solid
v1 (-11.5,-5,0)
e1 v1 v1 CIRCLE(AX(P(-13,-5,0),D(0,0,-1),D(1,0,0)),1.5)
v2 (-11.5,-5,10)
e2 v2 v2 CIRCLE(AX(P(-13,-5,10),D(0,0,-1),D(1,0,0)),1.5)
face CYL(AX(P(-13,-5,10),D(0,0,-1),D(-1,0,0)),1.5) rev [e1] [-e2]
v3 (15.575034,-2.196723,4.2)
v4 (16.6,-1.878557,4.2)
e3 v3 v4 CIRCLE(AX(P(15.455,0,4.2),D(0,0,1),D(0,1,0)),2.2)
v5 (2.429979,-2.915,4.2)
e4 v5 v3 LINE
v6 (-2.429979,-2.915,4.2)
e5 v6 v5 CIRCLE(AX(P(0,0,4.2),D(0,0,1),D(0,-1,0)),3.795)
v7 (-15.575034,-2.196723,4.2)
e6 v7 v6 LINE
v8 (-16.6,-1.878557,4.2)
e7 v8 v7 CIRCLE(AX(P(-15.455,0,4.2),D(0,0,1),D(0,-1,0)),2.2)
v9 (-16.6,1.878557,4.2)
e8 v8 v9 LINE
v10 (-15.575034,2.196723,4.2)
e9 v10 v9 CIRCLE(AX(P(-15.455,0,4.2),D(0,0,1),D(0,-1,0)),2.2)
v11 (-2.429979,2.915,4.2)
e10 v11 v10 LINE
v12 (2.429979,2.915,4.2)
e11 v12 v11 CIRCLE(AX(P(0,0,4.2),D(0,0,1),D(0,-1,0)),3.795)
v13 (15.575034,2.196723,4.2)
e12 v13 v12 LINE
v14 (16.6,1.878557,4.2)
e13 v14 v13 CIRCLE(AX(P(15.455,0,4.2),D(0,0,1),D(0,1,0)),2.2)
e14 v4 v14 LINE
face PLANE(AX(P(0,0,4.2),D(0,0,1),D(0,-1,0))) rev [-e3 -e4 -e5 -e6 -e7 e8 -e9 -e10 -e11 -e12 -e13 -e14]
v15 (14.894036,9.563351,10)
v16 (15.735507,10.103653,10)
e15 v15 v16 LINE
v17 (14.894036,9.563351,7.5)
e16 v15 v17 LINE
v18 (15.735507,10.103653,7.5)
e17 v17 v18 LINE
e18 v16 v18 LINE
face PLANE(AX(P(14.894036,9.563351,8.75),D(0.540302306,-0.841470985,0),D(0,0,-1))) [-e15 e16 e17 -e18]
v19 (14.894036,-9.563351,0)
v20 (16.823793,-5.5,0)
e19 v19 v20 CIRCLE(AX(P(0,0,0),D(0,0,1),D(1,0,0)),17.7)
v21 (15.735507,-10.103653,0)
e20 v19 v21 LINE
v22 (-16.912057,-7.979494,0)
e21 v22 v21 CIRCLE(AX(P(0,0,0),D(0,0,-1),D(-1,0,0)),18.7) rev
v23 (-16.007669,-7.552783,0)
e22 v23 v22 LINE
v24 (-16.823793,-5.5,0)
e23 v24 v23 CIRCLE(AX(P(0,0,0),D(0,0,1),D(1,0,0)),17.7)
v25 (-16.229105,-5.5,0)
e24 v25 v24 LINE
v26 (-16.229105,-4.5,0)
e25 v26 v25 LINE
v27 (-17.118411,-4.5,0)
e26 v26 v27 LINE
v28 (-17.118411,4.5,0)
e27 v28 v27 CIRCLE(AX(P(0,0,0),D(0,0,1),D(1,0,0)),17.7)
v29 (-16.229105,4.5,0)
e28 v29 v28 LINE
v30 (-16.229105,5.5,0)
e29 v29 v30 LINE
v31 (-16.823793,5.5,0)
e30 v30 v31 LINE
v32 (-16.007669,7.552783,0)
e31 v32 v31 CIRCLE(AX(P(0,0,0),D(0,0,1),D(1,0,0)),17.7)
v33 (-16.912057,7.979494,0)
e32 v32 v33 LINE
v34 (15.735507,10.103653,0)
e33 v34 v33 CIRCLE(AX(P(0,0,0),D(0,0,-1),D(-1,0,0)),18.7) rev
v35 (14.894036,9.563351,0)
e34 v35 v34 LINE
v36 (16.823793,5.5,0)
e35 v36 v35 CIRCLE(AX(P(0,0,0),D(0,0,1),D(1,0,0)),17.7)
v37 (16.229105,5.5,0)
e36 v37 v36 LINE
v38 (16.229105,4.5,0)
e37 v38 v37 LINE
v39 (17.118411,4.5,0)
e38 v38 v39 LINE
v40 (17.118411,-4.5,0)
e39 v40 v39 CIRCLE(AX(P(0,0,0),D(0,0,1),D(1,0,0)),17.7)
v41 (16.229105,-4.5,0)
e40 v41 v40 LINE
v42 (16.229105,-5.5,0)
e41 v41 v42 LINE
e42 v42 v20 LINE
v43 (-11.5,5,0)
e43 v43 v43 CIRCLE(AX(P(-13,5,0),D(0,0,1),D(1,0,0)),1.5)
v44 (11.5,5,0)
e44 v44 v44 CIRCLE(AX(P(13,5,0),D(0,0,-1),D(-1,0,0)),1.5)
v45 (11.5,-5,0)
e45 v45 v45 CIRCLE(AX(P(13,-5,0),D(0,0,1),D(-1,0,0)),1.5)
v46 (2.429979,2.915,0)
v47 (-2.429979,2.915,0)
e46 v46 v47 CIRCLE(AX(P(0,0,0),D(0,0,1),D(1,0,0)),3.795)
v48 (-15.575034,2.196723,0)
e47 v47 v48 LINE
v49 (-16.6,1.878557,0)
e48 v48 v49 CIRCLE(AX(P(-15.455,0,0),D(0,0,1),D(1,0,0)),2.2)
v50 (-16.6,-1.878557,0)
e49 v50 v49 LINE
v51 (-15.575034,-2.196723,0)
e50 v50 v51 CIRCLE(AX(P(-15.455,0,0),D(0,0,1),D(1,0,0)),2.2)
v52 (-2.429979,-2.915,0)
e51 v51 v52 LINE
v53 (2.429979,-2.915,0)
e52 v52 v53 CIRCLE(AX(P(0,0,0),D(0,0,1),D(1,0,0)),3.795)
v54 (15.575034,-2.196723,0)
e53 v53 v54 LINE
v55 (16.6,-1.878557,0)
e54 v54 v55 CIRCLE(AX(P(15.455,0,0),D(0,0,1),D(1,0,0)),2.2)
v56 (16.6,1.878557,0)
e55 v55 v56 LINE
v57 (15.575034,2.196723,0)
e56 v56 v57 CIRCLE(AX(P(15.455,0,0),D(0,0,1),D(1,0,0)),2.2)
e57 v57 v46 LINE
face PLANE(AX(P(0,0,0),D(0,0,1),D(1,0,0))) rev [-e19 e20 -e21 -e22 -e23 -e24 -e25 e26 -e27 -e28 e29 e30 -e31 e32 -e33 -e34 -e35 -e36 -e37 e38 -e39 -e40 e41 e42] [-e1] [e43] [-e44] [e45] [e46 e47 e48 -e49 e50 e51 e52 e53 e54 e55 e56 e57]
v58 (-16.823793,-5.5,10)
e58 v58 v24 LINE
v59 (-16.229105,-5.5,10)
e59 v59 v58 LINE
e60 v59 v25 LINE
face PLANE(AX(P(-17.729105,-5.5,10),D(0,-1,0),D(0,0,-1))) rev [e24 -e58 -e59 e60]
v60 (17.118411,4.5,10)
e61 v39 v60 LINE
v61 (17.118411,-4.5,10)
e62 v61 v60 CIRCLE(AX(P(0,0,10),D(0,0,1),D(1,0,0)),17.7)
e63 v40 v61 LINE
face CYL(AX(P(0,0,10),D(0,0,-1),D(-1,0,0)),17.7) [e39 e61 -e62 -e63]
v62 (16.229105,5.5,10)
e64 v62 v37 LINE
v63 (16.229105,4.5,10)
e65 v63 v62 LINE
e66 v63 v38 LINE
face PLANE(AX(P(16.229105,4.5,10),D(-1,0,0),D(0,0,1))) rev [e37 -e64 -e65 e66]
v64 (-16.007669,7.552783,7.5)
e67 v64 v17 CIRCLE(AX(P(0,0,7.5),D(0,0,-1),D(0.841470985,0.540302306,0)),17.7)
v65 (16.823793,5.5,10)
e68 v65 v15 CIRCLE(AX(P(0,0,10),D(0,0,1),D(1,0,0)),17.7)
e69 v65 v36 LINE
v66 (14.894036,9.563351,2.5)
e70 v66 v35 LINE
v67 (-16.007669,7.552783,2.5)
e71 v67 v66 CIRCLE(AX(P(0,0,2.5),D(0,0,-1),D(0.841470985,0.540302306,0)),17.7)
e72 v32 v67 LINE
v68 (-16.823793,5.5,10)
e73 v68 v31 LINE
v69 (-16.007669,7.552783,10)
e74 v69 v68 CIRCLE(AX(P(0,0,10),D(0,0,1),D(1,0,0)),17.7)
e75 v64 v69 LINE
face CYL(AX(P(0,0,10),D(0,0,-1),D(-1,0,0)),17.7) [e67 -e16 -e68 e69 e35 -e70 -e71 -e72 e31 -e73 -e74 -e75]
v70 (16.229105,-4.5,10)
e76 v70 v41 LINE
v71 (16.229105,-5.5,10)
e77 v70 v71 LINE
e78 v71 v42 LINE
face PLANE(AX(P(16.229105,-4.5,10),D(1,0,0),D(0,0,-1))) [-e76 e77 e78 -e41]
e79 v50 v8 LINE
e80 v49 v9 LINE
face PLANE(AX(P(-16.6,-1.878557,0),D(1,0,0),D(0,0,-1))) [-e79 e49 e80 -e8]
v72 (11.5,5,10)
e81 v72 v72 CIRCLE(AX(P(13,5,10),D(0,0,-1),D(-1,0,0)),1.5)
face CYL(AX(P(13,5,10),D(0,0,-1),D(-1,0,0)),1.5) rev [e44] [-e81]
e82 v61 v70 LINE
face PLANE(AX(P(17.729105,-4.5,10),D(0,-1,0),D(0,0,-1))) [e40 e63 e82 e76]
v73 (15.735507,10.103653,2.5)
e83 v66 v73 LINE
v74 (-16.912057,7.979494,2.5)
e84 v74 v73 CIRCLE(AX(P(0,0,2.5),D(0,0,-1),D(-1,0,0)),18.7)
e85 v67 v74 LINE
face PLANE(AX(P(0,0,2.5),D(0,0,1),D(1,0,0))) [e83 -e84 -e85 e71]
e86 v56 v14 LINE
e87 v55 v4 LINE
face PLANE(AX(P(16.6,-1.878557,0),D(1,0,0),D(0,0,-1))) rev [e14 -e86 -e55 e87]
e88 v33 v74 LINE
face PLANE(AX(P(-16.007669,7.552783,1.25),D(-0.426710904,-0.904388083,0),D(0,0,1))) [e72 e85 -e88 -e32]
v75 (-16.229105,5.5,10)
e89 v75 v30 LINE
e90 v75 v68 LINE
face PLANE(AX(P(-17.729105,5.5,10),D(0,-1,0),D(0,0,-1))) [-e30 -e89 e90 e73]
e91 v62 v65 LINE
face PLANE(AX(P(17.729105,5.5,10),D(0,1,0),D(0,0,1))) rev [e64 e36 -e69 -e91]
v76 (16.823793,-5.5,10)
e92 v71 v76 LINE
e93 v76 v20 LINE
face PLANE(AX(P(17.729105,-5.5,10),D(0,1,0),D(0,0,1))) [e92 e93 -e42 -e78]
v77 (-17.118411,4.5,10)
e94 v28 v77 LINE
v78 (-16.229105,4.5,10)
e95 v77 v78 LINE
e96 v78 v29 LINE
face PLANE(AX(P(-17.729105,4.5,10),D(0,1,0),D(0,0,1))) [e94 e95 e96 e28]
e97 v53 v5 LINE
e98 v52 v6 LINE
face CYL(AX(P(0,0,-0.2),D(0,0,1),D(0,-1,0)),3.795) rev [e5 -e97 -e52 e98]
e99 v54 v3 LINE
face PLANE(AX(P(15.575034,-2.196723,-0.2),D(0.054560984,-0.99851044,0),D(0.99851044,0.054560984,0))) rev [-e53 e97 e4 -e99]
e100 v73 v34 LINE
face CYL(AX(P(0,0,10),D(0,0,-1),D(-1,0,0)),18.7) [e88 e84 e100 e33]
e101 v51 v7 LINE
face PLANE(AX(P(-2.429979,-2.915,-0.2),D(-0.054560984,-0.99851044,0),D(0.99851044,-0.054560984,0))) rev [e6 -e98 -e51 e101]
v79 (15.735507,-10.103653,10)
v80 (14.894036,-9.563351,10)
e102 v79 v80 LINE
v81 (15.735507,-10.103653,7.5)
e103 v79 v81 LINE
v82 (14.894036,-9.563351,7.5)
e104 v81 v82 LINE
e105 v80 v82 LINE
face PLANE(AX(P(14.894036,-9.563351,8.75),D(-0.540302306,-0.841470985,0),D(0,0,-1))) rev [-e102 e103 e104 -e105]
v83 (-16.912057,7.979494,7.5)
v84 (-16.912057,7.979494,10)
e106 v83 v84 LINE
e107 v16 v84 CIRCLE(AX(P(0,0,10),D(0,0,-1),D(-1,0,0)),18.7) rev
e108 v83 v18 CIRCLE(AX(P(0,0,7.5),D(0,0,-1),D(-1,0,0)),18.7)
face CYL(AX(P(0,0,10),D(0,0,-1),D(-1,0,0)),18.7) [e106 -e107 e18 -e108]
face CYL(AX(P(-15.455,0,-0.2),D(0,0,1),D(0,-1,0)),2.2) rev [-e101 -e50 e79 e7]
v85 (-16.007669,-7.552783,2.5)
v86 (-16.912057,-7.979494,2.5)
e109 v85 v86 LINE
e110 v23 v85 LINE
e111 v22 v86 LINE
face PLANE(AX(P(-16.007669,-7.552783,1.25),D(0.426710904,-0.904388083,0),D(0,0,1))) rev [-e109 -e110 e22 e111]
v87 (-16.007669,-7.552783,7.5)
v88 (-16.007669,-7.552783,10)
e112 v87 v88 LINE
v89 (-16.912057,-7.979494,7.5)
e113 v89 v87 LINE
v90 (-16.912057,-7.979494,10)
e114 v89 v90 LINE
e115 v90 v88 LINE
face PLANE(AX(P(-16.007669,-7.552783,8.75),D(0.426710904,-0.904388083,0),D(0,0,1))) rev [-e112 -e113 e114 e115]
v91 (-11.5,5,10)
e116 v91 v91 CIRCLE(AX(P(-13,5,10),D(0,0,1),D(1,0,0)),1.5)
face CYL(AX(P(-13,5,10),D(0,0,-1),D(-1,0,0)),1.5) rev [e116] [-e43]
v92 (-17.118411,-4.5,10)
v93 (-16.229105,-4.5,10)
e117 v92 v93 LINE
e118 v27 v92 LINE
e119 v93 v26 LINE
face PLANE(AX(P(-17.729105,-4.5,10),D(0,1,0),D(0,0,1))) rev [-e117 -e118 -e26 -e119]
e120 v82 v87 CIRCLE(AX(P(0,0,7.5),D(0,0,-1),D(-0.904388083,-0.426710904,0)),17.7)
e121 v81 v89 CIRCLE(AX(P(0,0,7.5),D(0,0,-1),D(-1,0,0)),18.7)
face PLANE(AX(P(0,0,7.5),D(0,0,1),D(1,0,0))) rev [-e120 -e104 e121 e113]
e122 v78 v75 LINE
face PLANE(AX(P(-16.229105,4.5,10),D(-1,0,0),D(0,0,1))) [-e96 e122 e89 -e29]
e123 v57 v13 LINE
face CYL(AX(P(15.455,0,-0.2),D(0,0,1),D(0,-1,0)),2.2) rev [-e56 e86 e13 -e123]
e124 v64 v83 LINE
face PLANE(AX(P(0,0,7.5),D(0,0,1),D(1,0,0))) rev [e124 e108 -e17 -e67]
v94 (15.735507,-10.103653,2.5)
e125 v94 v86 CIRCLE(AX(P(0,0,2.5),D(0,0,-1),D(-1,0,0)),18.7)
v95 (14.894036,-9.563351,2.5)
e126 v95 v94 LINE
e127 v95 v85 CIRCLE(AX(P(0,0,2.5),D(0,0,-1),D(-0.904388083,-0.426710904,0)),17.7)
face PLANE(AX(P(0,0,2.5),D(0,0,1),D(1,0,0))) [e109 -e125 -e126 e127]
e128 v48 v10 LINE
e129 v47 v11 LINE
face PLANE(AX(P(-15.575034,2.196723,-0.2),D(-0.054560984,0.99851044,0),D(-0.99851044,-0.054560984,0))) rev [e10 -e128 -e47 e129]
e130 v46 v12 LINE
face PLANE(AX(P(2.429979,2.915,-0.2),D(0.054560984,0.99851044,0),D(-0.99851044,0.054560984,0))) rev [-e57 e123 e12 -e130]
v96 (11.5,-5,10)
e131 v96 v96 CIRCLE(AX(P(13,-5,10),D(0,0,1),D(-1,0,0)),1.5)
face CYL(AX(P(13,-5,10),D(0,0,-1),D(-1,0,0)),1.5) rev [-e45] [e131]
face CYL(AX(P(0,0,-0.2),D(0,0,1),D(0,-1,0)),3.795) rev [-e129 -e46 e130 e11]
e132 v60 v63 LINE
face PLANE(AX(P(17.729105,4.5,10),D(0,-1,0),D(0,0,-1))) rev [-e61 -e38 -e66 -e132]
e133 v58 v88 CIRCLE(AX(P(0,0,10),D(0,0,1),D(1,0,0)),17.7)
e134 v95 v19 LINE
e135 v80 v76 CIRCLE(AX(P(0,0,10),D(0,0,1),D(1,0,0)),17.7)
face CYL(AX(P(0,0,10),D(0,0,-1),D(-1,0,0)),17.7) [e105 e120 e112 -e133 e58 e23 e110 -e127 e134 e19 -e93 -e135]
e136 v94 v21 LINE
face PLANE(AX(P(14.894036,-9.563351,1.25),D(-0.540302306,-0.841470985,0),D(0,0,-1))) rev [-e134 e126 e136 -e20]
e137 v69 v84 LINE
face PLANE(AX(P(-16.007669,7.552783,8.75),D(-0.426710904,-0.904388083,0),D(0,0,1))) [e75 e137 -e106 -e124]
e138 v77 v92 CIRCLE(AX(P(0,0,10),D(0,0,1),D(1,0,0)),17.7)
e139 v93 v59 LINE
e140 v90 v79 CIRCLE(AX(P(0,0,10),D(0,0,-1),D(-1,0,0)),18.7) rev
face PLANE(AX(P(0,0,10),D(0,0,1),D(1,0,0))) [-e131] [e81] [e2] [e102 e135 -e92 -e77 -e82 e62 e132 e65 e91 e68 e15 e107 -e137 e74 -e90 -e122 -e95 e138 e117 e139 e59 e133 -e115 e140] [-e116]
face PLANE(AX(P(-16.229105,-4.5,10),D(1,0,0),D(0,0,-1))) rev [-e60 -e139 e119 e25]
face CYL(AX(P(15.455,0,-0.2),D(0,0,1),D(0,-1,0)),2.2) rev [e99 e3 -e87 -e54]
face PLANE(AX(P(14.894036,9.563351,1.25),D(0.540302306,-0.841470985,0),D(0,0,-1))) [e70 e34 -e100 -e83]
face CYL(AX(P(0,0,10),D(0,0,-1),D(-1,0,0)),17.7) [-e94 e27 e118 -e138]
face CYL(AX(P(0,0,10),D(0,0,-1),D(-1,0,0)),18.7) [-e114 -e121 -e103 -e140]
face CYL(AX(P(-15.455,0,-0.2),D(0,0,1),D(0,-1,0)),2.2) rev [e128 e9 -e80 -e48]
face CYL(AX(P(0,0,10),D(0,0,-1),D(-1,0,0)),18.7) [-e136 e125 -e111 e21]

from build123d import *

# Parameters (mm, degrees)
CROQUIS1_R                   = 17.7
SALIENTE_EXTRUIR1_DEPTH      = 10
ENVOLVER1_SECTION_W          = 1
ENVOLVER1_SECTION_H          = 2.5
ENVOLVER1_ANGLE              = 122.036773313
ENVOLVER1_SECTOR_2_SECTION_W = 1
ENVOLVER1_SECTOR_2_SECTION_H = 2.5
ENVOLVER1_SECTOR_2_ANGLE     = 122.036773313
SIMETR_A1_DEPTH              = 2.5
SIMETR_A1_START              = 7.5
SIMETR_A1_2_DEPTH            = 2.5
CAVIDAD1_DEPTH               = 4.2
SALIENTE_EXTRUIR2_START      = 4.2
SALIENTE_EXTRUIR2_DEPTH      = 4.2
CROQUIS6_R                   = 1.5
CORTAR_EXTRUIR1_DEPTH        = 10
CROQUIS8_W                   = 1.5
CROQUIS8_H                   = 1
CORTAR_EXTRUIR2_DEPTH        = 10
SIMETR_A4_COPY_1_SKETCH_R    = 1.5
SIMETR_A4_COPY_1_DEPTH       = 10
SIMETR_A4_COPY_2_SKETCH_W    = 1.5
SIMETR_A4_COPY_2_SKETCH_H    = 1
SIMETR_A4_COPY_2_DEPTH       = 10


# Read off the part's stored shape, not the designer's step: Simetría1, Cavidad1
with BuildPart() as part:
    # Croquis1 → Saliente-Extruir1 (new body)
    with BuildSketch(Plane.XY):
        Circle(CROQUIS1_R)
    extrude(amount=SALIENTE_EXTRUIR1_DEPTH)

    # Envolver1 section (on wrap section) → Envolver1 (revolve)
    with BuildSketch(Plane(origin=(0, 0, 0), x_dir=(-0.9043880828615337, 0.4267109039830592, 0), z_dir=(-0.4267109039830592, -0.9043880828615337, 0))):
        with Locations((18.2, -8.75)):
            Rectangle(ENVOLVER1_SECTION_W, ENVOLVER1_SECTION_H)
    revolve(axis=Axis((0, 0, 0), (0, 0, -1)), revolution_arc=ENVOLVER1_ANGLE)

    # Envolver1 sector 2 section (on wrap section) → Envolver1 sector 2 (revolve)
    with BuildSketch(Plane(origin=(0, 0, 0), x_dir=(-0.9043880828615337, 0.4267109039830592, 0), z_dir=(-0.4267109039830592, -0.9043880828615337, 0))):
        with Locations((18.2, -1.25)):
            Rectangle(ENVOLVER1_SECTOR_2_SECTION_W, ENVOLVER1_SECTOR_2_SECTION_H)
    revolve(axis=Axis((0, 0, 0), (0, 0, -1)), revolution_arc=ENVOLVER1_SECTOR_2_ANGLE)

    # Simetría1 outline → Simetría1 (add)
    with BuildSketch(Plane.XY):
        with BuildLine():
            ThreePointArc((-16.91205715, -7.979493904), (-1.214117133, -18.660544461), (15.735507416, -10.10365312))
            Line((15.735507416, -10.10365312), (14.894036431, -9.563350814))
            ThreePointArc((14.894036431, -9.563350814), (-1.149191083, -17.662654383), (-16.007669067, -7.552783))
            Line((-16.007669067, -7.552783), (-16.91205715, -7.979493904))
        make_face()
    extrude(amount=SIMETR_A1_DEPTH)

    # Simetr_a1 2 outline → Simetr_a1 2 (add)
    with BuildSketch(Plane.XY.offset(SIMETR_A1_START)):
        with BuildLine():
            ThreePointArc((-16.91205715, -7.979493904), (-1.214117133, -18.660544461), (15.735507416, -10.10365312))
            Line((15.735507416, -10.10365312), (14.894036431, -9.563350814))
            ThreePointArc((14.894036431, -9.563350814), (-1.149191083, -17.662654383), (-16.007669067, -7.552783))
            Line((-16.007669067, -7.552783), (-16.91205715, -7.979493904))
        make_face()
    extrude(amount=SIMETR_A1_2_DEPTH)

    # Cavidad1 outline → Cavidad1 (cut)
    with BuildSketch(Plane.XY):
        with BuildLine():
            Line((15.575034164, 2.196722968), (2.429979424, 2.915))
            ThreePointArc((2.429979424, 2.915), (0, 3.795), (-2.429979424, 2.915))
            Line((-2.429979424, 2.915), (-15.575034164, 2.196722968))
            ThreePointArc((-15.575034164, 2.196722968), (-17.655, 0), (-15.575034164, -2.196722968))
            Line((-15.575034164, -2.196722968), (-2.429979424, -2.915))
            ThreePointArc((-2.429979424, -2.915), (0, -3.795), (2.429979424, -2.915))
            Line((2.429979424, -2.915), (15.575034164, -2.196722968))
            ThreePointArc((15.575034164, -2.196722968), (17.655, 0), (15.575034164, 2.196722968))
        make_face()
    extrude(amount=CAVIDAD1_DEPTH, mode=Mode.SUBTRACT)

    # Croquis5 → Saliente-Extruir2 (add)
    with BuildSketch(Plane(origin=(0, 0, 4.2), x_dir=(-1, 0, 0), z_dir=(0, 0, -1)).offset(SALIENTE_EXTRUIR2_START)):
        with BuildLine():
            Line((16.6, -1.878556627), (16.6, 1.878556627))
            ThreePointArc((16.6, 1.878556627), (17.655, 0), (16.6, -1.878556627))
        make_face()
    saliente_extruir2 = extrude(amount=-SALIENTE_EXTRUIR2_DEPTH)

    # Simetría2: Saliente-Extruir2 across plane
    add(saliente_extruir2.mirror(Plane(origin=(0, 0, 0), x_dir=(0, 0, 1), z_dir=(1, 0, 0))))

    # Croquis6 → Cortar-Extruir1 (cut)
    with BuildSketch(Plane(origin=(0, 0, 0), x_dir=(-1, 0, 0), z_dir=(0, 0, -1))):
        with Locations((-13, 5)):
            Circle(CROQUIS6_R)
    cortar_extruir1 = extrude(amount=-CORTAR_EXTRUIR1_DEPTH, mode=Mode.SUBTRACT)

    # Croquis8 → Cortar-Extruir2 (cut)
    with BuildSketch(Plane(origin=(0, 0, 0), x_dir=(-1, 0, 0), z_dir=(0, 0, -1))):
        with Locations((-16.979104806, 5)):
            Rectangle(CROQUIS8_W, CROQUIS8_H)
    cortar_extruir2 = extrude(amount=-CORTAR_EXTRUIR2_DEPTH, mode=Mode.SUBTRACT)

    # Simetría3: Cortar-Extruir1, Cortar-Extruir2 across plane
    add(cortar_extruir1.mirror(Plane.ZX), mode=Mode.SUBTRACT)
    add(cortar_extruir2.mirror(Plane.ZX), mode=Mode.SUBTRACT)

    # Simetría4: Cortar-Extruir1, Cortar-Extruir2 across plane
    add(cortar_extruir1.mirror(Plane(origin=(0, 0, 0), x_dir=(0, 0, 1), z_dir=(1, 0, 0))), mode=Mode.SUBTRACT)
    add(cortar_extruir2.mirror(Plane(origin=(0, 0, 0), x_dir=(0, 0, 1), z_dir=(1, 0, 0))), mode=Mode.SUBTRACT)

    # Simetría4 copy 1 sketch → Simetría4 copy 1 (cut)
    with BuildSketch(Plane(origin=(0, 0, 0), x_dir=(1, 0, 0), z_dir=(0, 0, -1))):
        with Locations((-13, 5)):
            Circle(SIMETR_A4_COPY_1_SKETCH_R)
    extrude(amount=-SIMETR_A4_COPY_1_DEPTH, mode=Mode.SUBTRACT)

    # Simetría4 copy 2 sketch → Simetría4 copy 2 (cut)
    with BuildSketch(Plane(origin=(0, 0, 0), x_dir=(1, 0, 0), z_dir=(0, 0, -1))):
        with Locations((-16.979104806, 5)):
            Rectangle(SIMETR_A4_COPY_2_SKETCH_W, SIMETR_A4_COPY_2_SKETCH_H)
    extrude(amount=-SIMETR_A4_COPY_2_DEPTH, mode=Mode.SUBTRACT)


solid = part.part
